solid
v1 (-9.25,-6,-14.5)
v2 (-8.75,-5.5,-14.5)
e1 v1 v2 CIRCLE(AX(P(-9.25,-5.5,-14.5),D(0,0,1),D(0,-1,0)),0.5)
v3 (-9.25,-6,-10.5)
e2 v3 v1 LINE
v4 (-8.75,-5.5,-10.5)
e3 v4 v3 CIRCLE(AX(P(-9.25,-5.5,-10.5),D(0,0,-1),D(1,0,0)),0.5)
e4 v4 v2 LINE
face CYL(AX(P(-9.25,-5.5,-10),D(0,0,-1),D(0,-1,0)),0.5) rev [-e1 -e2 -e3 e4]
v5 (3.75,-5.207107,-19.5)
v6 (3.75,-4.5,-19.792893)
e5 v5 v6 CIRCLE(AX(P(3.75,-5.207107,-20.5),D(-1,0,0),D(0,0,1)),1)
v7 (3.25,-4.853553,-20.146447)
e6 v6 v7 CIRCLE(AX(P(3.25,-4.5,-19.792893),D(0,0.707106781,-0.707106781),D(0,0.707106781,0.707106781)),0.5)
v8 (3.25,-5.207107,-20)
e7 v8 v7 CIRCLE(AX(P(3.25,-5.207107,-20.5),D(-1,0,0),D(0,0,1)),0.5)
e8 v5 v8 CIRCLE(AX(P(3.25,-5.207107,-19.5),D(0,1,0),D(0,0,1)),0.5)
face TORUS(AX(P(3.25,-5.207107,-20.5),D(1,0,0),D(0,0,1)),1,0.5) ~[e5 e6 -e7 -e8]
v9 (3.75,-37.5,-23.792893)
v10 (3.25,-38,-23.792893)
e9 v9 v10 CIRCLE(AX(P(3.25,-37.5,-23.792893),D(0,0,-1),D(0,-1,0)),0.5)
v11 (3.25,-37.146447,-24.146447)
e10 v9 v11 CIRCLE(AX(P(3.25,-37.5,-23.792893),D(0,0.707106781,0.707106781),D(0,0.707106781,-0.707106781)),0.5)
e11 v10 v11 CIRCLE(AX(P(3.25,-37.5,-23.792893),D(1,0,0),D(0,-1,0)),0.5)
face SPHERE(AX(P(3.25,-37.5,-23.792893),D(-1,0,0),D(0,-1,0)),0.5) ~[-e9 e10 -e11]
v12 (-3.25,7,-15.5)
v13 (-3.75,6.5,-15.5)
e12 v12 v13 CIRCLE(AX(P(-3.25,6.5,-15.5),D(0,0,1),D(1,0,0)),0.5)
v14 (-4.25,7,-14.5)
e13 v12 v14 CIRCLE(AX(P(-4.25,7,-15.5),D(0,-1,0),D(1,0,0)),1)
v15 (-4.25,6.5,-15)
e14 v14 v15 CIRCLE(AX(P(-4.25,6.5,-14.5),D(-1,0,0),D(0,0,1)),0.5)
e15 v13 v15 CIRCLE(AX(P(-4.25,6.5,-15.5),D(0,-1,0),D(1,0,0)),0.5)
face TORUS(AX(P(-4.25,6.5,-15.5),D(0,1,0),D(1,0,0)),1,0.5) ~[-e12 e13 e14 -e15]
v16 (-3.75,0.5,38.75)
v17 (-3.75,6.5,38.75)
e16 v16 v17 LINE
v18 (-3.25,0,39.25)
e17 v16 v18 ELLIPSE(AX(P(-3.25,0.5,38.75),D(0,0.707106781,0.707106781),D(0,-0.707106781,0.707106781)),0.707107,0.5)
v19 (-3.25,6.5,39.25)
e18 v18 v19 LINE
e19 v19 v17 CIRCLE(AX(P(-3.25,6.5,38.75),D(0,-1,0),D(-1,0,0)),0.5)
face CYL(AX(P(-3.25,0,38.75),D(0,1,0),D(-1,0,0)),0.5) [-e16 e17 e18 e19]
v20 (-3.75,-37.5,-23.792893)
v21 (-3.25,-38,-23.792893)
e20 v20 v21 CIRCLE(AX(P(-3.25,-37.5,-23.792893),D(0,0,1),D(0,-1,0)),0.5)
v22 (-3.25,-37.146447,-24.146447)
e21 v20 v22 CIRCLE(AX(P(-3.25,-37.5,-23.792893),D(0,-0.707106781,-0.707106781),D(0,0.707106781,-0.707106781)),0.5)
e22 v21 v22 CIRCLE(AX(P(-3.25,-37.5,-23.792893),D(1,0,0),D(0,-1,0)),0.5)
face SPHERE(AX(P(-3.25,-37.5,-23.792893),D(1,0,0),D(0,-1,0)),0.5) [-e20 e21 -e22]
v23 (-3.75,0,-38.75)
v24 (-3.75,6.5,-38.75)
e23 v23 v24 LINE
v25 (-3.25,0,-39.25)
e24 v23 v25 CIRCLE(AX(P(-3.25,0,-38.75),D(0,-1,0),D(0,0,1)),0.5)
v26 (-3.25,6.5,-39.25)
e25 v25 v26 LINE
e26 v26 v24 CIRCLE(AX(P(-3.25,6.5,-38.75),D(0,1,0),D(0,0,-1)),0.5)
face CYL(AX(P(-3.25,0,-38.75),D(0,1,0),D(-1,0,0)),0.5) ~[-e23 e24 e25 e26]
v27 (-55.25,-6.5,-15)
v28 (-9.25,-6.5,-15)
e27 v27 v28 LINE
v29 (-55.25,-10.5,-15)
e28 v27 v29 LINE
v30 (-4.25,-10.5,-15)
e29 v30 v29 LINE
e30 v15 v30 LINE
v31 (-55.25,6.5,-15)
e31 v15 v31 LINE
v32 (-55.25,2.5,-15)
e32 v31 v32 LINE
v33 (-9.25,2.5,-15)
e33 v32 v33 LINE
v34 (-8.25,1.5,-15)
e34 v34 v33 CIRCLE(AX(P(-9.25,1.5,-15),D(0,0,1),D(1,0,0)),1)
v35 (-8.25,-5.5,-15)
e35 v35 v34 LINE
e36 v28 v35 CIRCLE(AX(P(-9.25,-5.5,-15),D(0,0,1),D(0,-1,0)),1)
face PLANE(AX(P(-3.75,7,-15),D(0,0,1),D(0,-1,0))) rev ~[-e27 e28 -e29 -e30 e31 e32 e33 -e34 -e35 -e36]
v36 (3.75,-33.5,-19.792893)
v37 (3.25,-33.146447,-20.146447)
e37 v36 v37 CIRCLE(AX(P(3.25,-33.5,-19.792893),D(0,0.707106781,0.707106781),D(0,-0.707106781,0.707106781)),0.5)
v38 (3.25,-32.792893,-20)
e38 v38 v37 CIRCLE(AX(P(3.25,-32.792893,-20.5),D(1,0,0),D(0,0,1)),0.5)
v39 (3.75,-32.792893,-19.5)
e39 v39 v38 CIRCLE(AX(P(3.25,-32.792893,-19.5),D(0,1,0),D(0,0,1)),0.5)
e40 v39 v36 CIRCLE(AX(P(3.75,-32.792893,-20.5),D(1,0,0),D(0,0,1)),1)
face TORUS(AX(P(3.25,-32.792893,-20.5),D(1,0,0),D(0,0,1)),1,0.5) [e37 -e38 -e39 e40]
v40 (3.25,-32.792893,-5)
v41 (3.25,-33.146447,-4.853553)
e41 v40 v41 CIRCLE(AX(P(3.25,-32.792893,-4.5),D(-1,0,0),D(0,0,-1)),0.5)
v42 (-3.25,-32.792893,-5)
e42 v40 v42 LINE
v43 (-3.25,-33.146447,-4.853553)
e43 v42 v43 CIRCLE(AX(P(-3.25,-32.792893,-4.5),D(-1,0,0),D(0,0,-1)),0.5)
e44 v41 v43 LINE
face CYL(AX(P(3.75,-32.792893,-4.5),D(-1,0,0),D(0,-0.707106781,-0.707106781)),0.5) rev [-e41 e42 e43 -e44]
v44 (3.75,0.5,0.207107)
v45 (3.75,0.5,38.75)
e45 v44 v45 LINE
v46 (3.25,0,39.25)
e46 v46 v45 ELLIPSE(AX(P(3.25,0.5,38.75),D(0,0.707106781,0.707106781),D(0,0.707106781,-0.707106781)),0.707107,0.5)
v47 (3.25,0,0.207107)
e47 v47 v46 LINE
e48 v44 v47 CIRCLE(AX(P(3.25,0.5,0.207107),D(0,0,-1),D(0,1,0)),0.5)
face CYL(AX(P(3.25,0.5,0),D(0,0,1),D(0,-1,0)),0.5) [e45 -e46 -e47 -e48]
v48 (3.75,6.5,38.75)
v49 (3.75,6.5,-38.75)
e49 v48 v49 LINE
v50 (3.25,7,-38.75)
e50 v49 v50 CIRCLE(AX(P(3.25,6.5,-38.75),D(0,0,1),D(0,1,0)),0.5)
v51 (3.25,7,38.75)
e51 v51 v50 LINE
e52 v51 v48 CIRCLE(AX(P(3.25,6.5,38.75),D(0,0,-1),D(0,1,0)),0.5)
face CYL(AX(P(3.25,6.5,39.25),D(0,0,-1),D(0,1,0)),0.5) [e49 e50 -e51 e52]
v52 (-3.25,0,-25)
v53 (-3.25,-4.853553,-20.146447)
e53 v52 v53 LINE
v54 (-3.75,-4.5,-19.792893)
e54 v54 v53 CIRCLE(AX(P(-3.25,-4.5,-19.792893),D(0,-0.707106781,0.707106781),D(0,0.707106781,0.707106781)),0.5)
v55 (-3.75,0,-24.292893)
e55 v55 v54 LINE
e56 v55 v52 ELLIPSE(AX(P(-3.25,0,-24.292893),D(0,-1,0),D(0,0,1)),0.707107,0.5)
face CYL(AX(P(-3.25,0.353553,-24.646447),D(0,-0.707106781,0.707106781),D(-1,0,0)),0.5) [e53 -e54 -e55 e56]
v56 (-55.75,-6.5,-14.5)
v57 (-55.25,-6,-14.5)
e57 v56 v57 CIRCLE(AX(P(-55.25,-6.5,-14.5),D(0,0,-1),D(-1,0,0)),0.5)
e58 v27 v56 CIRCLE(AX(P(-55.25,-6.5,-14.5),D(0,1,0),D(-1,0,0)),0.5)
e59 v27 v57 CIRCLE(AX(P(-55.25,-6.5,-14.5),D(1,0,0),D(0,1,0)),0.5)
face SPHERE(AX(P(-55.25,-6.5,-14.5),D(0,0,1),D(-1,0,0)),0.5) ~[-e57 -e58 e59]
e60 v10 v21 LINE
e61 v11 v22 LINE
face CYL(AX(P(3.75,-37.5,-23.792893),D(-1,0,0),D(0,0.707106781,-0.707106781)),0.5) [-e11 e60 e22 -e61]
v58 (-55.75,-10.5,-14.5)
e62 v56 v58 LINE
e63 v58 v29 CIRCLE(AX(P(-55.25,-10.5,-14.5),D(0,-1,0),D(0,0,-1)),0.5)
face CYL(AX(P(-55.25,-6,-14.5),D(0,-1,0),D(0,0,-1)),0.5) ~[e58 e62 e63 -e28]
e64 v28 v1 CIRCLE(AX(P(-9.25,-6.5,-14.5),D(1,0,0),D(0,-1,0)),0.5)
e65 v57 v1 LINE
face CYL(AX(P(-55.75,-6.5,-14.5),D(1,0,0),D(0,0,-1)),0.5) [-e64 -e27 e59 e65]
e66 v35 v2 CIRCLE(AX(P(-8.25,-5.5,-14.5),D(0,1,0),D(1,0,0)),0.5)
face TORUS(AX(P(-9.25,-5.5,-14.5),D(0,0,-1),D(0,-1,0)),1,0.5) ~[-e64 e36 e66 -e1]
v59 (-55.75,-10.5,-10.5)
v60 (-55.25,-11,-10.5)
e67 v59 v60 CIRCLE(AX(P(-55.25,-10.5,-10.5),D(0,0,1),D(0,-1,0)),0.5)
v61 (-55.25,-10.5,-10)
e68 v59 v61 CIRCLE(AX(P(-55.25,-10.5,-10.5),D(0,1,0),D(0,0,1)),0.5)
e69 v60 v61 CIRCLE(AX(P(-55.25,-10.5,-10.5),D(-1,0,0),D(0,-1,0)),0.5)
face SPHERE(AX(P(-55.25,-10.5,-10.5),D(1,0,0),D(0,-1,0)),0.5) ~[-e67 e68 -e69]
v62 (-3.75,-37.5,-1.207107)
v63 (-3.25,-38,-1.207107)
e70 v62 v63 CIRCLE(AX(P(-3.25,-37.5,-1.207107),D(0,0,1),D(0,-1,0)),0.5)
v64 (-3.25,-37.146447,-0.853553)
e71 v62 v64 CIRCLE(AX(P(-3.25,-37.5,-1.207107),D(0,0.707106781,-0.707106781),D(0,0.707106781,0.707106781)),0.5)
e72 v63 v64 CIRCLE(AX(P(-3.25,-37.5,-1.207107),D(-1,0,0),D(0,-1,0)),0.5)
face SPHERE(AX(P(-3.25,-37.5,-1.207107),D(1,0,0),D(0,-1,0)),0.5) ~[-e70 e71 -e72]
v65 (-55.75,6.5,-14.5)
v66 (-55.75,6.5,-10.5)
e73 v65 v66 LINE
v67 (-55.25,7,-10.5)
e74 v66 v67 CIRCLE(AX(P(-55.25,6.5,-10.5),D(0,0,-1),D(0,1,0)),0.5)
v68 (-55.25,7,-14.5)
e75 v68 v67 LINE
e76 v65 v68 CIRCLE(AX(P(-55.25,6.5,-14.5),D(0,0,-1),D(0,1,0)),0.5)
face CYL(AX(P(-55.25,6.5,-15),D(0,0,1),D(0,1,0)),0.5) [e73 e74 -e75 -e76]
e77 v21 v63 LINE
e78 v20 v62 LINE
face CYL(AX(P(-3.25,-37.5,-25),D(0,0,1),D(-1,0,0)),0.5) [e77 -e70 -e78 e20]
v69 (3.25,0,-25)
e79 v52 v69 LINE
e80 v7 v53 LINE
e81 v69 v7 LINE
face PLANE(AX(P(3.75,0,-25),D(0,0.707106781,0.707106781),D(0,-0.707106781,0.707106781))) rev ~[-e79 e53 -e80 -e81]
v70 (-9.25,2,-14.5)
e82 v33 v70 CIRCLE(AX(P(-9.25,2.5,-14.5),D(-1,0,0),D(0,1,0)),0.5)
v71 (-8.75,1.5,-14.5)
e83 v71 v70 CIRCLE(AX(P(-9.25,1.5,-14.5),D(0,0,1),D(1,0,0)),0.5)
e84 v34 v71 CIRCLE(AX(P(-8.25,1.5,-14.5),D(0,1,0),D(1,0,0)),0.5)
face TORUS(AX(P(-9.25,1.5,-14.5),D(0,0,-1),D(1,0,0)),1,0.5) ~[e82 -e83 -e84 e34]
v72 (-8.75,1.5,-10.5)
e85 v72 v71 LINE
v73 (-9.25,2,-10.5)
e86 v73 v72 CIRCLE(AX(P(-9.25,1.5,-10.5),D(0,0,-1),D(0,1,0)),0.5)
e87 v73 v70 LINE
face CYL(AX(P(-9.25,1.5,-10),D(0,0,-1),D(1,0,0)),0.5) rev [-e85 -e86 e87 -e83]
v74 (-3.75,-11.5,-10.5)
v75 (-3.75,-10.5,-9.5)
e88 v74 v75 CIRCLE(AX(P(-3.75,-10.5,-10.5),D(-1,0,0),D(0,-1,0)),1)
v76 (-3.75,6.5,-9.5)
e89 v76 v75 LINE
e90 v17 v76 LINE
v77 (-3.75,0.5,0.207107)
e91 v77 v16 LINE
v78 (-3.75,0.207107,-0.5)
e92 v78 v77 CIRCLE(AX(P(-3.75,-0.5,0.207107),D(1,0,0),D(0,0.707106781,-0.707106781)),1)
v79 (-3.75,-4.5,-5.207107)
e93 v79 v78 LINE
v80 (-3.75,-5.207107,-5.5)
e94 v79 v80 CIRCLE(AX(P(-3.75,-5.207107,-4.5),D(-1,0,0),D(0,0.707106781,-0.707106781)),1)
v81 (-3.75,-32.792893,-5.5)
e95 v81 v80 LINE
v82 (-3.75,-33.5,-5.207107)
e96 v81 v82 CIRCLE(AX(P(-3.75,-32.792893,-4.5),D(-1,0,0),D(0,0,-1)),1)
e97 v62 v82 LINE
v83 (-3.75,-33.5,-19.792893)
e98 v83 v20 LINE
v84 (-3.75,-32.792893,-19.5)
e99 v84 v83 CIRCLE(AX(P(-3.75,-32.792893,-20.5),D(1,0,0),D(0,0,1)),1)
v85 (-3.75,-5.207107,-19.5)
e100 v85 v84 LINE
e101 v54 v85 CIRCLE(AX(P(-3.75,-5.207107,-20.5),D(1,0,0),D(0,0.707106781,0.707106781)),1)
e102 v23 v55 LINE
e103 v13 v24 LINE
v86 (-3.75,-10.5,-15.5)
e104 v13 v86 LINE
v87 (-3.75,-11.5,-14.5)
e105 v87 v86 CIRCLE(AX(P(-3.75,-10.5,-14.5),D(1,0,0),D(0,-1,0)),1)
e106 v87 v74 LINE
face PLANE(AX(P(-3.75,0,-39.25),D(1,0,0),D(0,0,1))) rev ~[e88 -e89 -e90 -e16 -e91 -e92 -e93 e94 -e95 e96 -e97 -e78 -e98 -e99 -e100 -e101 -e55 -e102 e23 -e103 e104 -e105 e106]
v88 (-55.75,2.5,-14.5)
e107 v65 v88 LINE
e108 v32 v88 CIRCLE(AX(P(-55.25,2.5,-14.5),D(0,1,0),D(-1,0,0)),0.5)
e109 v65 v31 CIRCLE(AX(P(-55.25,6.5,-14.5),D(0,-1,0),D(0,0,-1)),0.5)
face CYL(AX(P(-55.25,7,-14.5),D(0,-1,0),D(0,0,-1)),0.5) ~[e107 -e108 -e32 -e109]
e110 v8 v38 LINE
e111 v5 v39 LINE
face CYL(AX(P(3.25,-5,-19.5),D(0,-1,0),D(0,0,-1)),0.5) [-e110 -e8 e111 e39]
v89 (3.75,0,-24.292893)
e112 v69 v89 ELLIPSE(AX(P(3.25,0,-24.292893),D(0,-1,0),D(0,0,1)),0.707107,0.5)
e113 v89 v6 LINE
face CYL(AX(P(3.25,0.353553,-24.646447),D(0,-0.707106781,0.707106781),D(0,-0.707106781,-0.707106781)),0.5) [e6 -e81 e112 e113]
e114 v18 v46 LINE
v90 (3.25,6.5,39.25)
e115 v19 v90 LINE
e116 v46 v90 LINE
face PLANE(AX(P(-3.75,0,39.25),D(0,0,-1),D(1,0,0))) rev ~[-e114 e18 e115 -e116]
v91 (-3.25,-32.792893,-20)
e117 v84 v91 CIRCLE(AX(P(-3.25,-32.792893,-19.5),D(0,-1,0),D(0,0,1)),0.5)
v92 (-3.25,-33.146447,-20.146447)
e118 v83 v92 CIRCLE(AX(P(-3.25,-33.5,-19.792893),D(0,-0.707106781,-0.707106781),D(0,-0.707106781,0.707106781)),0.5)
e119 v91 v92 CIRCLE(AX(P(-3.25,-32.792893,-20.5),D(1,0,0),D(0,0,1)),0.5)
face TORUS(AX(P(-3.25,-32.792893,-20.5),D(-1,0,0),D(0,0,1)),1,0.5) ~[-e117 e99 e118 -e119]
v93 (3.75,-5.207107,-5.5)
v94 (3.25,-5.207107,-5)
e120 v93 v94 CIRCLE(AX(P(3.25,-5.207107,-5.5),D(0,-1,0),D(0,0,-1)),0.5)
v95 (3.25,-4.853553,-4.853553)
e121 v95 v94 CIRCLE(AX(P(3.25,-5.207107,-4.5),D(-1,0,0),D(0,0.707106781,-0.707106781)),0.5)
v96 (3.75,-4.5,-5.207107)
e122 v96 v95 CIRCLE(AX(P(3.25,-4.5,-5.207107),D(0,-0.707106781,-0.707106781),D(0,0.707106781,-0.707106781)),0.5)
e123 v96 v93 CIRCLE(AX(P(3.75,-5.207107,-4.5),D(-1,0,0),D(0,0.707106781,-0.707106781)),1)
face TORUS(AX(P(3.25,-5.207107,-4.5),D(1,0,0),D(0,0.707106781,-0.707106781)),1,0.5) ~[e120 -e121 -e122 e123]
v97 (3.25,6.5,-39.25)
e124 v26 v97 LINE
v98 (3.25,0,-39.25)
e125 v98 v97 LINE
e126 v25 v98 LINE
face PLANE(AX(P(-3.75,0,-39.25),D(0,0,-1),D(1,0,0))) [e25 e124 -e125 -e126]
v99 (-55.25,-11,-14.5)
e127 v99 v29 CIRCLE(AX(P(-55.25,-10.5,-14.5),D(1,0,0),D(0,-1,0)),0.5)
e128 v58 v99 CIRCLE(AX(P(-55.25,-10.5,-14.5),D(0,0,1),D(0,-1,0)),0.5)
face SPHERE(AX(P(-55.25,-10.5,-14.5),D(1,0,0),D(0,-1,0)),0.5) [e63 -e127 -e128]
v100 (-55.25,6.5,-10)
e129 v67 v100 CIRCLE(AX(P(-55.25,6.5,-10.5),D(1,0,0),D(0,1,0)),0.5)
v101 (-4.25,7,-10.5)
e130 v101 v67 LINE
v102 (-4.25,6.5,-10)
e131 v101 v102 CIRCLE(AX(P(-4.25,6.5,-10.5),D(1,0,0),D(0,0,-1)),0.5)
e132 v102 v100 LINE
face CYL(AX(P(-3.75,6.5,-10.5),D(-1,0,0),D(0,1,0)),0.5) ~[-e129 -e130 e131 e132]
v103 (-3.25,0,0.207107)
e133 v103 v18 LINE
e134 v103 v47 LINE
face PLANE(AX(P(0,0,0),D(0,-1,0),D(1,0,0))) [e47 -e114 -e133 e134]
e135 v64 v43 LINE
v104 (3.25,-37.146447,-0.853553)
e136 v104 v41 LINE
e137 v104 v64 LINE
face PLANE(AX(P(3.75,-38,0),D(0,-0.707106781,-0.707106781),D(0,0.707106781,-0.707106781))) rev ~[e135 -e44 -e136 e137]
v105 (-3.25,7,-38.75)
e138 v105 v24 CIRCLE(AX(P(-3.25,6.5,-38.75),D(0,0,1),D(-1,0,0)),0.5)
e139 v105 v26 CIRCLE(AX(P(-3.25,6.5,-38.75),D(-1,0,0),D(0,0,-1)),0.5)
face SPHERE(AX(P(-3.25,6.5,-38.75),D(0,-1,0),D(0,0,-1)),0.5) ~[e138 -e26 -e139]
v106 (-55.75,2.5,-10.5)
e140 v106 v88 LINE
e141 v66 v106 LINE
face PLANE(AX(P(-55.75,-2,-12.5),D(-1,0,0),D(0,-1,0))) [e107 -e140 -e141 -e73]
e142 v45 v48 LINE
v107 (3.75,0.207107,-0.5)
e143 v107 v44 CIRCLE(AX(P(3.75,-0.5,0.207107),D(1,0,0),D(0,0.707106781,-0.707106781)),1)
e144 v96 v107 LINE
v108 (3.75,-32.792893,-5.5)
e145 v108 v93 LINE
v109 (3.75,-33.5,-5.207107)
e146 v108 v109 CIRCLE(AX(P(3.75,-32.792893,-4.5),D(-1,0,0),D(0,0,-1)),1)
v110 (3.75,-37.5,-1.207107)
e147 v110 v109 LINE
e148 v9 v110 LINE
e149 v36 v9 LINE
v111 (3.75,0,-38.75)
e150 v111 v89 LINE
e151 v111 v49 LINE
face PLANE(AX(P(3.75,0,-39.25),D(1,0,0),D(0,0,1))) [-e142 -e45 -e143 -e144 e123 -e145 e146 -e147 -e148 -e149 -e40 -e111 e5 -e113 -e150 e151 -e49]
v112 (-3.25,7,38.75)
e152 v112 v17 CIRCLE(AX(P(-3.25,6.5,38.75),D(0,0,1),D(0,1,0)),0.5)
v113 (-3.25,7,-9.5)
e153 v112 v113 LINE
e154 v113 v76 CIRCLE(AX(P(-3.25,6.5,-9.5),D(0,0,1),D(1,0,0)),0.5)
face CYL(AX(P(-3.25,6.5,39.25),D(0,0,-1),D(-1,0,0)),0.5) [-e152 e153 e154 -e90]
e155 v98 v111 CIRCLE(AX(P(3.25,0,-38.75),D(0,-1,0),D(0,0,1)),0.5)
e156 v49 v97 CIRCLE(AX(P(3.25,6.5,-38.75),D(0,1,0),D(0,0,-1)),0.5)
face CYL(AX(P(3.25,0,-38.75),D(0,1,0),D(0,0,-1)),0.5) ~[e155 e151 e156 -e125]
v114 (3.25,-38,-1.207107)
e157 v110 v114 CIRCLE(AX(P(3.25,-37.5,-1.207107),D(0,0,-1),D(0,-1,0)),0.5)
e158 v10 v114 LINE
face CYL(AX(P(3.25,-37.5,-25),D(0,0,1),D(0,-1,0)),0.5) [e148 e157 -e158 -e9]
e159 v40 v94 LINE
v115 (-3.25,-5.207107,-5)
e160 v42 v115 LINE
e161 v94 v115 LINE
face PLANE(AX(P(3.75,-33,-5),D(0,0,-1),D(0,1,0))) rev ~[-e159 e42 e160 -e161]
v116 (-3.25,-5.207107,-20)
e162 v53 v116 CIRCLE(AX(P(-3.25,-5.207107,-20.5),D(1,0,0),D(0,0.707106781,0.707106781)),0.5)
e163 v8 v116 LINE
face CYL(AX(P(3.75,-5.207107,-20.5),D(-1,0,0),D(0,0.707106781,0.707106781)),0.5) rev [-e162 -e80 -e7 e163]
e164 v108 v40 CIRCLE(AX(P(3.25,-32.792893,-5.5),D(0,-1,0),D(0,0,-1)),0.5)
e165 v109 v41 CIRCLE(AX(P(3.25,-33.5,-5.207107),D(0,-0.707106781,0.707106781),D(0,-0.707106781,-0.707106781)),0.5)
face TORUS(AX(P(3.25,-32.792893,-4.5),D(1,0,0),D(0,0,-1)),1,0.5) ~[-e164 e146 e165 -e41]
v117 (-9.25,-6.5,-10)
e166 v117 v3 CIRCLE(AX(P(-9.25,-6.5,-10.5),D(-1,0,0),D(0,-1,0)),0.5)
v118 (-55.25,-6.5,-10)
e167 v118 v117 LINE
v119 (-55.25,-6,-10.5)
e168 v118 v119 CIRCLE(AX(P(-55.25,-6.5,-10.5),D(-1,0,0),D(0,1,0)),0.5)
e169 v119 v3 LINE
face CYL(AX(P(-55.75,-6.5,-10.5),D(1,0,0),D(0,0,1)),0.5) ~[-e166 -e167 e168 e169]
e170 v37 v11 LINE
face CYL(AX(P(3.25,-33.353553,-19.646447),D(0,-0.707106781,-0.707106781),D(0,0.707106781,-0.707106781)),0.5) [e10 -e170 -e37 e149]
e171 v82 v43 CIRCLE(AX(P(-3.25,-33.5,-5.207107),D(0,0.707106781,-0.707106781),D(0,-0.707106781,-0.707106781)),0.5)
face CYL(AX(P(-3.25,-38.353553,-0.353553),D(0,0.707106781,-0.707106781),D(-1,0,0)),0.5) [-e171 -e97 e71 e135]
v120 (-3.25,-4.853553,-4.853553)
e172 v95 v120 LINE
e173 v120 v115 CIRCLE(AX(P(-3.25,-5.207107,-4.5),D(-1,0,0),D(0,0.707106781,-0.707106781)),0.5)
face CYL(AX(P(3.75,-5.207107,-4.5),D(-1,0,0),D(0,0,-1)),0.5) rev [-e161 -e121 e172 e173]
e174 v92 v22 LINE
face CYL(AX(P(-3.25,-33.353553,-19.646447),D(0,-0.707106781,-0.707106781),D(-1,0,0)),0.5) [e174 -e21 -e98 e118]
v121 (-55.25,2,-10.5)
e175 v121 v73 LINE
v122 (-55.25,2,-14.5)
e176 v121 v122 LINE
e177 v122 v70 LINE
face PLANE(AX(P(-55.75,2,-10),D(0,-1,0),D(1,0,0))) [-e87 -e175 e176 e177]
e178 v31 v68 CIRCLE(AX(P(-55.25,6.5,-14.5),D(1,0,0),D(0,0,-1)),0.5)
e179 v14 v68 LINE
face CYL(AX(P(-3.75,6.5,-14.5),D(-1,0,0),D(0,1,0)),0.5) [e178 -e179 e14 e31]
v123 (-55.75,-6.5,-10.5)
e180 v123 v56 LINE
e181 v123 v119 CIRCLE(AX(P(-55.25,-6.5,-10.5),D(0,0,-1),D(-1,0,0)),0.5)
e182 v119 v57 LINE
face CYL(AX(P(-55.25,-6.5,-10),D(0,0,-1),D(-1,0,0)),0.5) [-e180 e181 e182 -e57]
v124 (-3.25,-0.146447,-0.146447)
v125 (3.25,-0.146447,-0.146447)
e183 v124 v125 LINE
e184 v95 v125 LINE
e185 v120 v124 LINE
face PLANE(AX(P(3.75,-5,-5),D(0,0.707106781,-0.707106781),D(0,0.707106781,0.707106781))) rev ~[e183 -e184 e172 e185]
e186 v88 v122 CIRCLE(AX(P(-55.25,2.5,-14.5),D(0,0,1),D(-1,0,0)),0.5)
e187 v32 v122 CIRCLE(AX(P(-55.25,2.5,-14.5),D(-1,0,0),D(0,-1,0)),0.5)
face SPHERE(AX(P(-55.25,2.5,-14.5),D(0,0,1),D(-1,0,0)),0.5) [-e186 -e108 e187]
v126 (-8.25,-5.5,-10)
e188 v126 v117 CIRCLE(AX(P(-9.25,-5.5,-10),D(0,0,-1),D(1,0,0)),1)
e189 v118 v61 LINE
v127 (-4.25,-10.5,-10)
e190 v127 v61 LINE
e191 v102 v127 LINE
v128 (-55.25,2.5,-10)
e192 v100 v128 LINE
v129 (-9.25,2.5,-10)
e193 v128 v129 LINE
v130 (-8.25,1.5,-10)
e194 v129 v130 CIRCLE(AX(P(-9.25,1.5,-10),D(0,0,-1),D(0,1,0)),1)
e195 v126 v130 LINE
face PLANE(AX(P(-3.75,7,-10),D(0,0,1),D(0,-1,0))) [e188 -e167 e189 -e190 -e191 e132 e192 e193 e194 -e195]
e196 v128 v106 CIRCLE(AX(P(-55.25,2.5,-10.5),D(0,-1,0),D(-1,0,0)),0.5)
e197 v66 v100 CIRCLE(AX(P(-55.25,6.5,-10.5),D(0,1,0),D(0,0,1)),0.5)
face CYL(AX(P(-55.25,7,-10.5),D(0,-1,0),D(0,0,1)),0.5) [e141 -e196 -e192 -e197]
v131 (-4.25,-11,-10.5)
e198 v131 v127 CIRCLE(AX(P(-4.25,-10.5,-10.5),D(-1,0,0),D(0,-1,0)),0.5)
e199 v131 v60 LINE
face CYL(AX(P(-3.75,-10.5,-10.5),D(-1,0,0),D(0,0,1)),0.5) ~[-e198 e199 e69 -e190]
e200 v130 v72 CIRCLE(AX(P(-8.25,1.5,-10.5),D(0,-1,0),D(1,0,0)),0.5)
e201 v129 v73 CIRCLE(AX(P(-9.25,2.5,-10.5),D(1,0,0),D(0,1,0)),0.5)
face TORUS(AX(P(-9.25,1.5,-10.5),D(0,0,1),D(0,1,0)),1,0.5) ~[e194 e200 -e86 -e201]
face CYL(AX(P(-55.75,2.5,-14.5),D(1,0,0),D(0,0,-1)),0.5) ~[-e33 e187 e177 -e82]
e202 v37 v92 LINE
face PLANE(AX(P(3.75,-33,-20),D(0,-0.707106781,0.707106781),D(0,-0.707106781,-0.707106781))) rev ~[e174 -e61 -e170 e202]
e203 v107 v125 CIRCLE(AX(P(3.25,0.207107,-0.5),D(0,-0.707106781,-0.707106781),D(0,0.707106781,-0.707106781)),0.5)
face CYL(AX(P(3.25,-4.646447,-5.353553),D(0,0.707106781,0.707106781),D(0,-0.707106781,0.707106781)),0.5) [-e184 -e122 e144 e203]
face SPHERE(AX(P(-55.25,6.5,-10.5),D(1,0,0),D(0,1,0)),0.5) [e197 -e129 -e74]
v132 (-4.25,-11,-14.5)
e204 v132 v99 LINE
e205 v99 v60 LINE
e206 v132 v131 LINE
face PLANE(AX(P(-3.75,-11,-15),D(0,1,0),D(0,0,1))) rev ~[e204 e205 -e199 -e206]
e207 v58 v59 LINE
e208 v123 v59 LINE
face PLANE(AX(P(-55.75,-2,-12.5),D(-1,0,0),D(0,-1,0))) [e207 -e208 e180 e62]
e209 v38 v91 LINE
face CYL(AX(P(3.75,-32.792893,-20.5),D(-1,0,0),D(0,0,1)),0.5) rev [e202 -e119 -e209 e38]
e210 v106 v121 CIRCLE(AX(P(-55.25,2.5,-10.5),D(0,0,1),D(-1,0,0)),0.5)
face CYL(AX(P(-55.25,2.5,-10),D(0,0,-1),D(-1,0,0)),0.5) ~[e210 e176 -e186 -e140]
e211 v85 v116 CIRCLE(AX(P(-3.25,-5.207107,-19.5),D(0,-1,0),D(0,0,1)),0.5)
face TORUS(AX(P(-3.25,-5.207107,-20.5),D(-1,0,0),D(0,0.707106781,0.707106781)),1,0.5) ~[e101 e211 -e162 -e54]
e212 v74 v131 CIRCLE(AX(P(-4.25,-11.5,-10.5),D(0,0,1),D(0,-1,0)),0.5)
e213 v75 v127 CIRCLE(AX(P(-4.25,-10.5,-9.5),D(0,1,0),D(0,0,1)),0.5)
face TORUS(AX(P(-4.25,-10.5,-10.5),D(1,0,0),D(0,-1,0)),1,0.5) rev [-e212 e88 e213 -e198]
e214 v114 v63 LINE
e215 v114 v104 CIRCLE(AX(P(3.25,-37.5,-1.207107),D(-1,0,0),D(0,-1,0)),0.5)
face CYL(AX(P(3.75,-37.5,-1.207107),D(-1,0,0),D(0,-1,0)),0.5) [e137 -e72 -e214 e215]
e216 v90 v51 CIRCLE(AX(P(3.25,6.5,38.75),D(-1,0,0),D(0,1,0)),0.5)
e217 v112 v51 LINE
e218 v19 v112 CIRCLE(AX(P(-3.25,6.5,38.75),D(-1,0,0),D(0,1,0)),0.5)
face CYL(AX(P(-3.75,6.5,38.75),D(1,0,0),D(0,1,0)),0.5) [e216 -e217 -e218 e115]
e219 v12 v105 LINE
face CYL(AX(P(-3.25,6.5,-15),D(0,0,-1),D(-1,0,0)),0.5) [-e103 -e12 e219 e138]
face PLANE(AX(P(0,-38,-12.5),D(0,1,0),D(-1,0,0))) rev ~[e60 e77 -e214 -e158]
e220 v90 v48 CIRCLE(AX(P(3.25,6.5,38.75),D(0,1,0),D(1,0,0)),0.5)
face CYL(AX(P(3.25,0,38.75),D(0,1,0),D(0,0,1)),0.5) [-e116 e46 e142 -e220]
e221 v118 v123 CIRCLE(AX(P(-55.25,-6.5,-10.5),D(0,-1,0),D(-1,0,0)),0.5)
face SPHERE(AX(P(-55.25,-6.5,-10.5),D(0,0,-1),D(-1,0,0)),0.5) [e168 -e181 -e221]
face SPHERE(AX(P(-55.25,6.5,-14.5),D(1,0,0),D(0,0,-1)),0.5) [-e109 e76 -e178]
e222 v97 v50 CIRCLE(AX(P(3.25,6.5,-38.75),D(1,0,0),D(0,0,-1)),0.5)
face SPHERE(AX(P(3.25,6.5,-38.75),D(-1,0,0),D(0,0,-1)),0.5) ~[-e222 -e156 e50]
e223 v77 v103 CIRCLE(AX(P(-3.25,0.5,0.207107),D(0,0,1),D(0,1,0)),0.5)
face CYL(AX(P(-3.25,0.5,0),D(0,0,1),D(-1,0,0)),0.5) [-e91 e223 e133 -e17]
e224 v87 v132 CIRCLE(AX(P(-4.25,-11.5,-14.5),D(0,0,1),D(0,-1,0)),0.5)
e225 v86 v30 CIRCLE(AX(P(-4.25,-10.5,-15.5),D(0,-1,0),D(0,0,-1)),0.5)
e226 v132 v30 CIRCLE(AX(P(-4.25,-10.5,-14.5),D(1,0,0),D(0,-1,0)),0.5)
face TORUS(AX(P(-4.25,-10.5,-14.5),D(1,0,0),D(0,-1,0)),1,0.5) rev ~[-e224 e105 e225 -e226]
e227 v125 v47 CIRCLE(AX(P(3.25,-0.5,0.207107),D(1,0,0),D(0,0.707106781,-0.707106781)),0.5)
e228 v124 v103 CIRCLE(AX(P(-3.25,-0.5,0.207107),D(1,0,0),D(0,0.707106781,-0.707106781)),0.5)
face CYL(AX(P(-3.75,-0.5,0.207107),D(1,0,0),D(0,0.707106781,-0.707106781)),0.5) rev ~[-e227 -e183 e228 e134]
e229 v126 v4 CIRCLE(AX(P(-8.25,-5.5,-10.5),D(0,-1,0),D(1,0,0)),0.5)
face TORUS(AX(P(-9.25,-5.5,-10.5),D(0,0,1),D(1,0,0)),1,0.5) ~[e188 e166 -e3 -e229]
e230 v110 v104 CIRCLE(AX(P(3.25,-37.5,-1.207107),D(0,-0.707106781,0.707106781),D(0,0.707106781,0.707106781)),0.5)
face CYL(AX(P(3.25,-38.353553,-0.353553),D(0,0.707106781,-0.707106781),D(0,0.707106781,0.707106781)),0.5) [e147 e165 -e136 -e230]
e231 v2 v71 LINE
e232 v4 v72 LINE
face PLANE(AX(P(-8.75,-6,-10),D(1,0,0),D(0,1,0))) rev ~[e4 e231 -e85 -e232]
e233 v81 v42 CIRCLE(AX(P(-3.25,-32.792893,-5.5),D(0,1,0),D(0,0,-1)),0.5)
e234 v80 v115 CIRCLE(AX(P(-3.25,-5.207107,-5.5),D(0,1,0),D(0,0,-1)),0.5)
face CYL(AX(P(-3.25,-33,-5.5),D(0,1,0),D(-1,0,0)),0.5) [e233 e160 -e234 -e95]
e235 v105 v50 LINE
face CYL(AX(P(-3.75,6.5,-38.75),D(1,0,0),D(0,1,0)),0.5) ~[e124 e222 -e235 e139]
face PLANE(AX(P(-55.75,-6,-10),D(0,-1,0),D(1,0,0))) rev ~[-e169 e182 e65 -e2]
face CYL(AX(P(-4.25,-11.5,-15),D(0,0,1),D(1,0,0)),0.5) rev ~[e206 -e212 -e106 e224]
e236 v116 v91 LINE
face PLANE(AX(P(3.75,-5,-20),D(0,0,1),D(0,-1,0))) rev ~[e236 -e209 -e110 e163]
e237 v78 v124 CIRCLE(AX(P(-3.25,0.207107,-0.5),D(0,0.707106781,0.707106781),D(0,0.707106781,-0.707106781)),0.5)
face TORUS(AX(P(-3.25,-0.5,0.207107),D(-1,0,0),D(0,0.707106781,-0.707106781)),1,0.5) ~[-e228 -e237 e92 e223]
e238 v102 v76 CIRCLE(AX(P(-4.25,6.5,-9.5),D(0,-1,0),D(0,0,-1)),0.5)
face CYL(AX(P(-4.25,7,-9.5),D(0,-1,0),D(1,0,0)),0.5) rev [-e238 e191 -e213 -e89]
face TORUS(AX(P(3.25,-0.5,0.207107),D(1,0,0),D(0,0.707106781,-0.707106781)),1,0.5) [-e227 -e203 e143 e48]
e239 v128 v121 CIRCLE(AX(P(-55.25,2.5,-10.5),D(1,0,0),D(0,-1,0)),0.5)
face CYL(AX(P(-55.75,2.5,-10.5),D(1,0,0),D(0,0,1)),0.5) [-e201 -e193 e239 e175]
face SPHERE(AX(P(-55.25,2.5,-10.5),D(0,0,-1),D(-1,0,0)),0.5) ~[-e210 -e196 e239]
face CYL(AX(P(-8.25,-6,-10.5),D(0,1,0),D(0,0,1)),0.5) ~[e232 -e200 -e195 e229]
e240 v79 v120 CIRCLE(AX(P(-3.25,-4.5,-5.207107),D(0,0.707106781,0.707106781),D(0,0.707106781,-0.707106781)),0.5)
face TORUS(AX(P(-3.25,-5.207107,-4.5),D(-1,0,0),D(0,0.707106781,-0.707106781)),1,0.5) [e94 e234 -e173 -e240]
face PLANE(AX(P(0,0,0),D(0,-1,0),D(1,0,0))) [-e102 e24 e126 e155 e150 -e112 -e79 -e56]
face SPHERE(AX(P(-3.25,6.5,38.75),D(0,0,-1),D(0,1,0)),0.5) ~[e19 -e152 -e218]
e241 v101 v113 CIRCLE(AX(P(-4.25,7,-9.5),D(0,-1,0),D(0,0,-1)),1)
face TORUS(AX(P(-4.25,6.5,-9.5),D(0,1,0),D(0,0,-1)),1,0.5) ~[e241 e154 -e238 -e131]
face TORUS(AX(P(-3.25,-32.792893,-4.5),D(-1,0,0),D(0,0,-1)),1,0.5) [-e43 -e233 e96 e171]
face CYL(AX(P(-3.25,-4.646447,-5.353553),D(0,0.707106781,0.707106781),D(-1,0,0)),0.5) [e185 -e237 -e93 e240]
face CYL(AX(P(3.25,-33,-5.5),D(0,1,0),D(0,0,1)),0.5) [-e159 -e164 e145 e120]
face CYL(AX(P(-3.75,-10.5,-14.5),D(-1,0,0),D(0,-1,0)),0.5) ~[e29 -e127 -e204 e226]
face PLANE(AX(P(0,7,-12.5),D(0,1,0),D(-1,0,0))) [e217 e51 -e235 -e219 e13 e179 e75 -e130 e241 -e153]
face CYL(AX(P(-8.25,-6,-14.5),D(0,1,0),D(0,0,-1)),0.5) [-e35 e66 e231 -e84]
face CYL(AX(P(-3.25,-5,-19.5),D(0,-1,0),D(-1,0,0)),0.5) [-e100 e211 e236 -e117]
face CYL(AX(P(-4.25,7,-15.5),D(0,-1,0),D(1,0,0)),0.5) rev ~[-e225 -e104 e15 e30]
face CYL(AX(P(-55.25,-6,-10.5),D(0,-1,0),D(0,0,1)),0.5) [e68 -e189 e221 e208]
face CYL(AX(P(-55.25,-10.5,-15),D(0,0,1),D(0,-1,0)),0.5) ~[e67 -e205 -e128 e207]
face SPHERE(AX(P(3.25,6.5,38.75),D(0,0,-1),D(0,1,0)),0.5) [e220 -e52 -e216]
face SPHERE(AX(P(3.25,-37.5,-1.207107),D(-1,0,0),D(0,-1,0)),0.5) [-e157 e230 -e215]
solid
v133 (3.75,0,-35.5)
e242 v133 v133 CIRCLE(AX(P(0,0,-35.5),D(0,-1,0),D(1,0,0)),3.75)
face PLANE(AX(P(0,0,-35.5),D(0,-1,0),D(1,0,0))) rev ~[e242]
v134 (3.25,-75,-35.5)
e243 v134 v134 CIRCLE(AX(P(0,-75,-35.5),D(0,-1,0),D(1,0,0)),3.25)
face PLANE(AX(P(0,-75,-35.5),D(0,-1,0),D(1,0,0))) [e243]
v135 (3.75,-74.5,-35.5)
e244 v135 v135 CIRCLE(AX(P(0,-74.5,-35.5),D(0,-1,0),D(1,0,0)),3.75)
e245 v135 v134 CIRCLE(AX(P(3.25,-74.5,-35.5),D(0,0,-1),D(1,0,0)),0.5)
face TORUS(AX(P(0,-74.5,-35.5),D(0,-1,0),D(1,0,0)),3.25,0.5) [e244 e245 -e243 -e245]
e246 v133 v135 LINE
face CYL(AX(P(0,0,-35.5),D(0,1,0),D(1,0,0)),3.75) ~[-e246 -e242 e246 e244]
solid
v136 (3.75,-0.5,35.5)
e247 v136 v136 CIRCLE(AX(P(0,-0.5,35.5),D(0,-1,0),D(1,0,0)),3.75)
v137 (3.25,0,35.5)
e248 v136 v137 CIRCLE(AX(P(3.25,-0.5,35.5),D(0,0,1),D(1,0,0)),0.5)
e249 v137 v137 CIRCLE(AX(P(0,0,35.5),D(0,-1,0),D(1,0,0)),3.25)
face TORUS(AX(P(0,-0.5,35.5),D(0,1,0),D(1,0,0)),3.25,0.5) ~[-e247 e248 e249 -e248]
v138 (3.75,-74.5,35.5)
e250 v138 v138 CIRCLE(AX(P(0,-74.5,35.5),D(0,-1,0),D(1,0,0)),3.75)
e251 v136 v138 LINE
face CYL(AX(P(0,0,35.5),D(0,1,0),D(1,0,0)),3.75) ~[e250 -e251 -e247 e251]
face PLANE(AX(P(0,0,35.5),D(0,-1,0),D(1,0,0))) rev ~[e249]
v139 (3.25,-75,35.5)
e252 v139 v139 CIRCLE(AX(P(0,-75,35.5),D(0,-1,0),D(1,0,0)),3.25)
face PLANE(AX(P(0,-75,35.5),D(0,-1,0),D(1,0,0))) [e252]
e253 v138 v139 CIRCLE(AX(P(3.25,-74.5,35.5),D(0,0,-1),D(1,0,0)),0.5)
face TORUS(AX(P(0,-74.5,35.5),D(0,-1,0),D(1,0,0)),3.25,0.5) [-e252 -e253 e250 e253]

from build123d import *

# Parameters (mm, degrees)
F0_R      = 3.75
F1_DEPTH  = 75
F2_W      = 7.5
F2_H      = 78.5
F3_DEPTH  = 7
F4_W      = 7.5
F4_H      = 25
F5_DEPTH  = 45
F7_DEPTH  = 25
F8_W      = 18
F8_H      = 5
F9_DEPTH  = 52
F10_W     = 47
F10_H     = 8
F11_DEPTH = 25
F12_R     = 0.5
F12_2_R   = 0.5
F12_3_R   = 0.5


with BuildPart() as f1:
    # F0 (on Front) → F1 (new body)
    with BuildSketch(Plane.XZ):
        with Locations((0, 35.5)):
            Circle(F0_R)
    extrude(amount=F1_DEPTH)

    # F12
    f12_edges = [f1.edges().sort_by_distance(p)[0] for p in [
        (-3.75, -75, 35.5),
        (3.75, -37.5, 35.5),
        (-3.75, 0, 35.5),
    ]]
    fillet(f12_edges, radius=F12_R)


with BuildPart() as f1b:
    # F0 (on Front) → F1, piece 2 (new body)
    with BuildSketch(Plane.XZ):
        with Locations((0, -35.5)):
            Circle(F0_R)
    extrude(amount=F1_DEPTH)

    # F12#2
    f12_2_edges = [f1b.edges().sort_by_distance(p)[0] for p in [
        (-3.75, -75, -35.5),
    ]]
    fillet(f12_2_edges, radius=F12_2_R)


with BuildPart() as f3:
    # F2 (on Front) → F3 (new body)
    with BuildSketch(Plane.XZ):
        Rectangle(F2_W, F2_H)
    extrude(amount=-F3_DEPTH)

    # F4 (on face) → F5 (join)
    with BuildSketch(Plane(origin=(0, 7, 0), x_dir=(-1, 0, 0), z_dir=(0, 1, 0))):
        with Locations((0, -12.5)):
            Rectangle(F4_W, F4_H)
    extrude(amount=-F5_DEPTH)

    # F6 (on face) → F7 (cut)
    with BuildSketch(Plane.YZ.offset(3.75)):
        Polygon((0, 0), (-38, 0), (-33, -5), (-5, -5), align=None)
        Polygon((-33, -20), (-38, -25), (0, -25), (-5, -20), align=None)
    extrude(amount=-F7_DEPTH, mode=Mode.SUBTRACT)

    # F8 (on face) → F9 (join)
    with BuildSketch(Plane(origin=(-3.75, 0, 0), x_dir=(0, -1, 0), z_dir=(-1, 0, 0))):
        with Locations((2, -12.5)):
            Rectangle(F8_W, F8_H)
    extrude(amount=F9_DEPTH)

    # F10 (on face) → F11 (cut)
    with BuildSketch(Plane.XY.offset(-10)):
        with Locations((-32.25, -2)):
            Rectangle(F10_W, F10_H)
    extrude(amount=-F11_DEPTH, mode=Mode.SUBTRACT)

    # F12#3
    f12_3_edges = [f3.edges().sort_by_distance(p)[0] for p in [
        (-55.75, 2, -12.5),
        (-55.75, -6, -12.5),
        (-8.75, 2, -12.5),
        (-3.75, 3.5, -39.25),
        (0, 7, -39.25),
        (3.75, 3.5, -39.25),
        (-3.75, 7, -27.125),
        (3.75, 7, 0),
        (-29.75, 7, -15),
        (-29.75, 7, -10),
        (-3.75, 7, 14.625),
        (3.75, -19, -20),
        (3.75, -2.5, -22.5),
        (-3.75, -2.5, -22.5),
        (-3.75, -19, -20),
        (0, -5, -20),
        (0, 0, 0),
        (0, -5, -5),
        (3.75, -2.5, -2.5),
        (3.75, -19, -5),
        (-3.75, -2.5, -2.5),
        (-3.75, 0, 19.625),
        (-3.75, -35.5, -2.5),
        (-29.75, -11, -15),
        (-29.75, -11, -10),
        (-3.75, -11, -12.5),
        (-55.75, -11, -12.5),
        (0, 7, 39.25),
        (3.75, 3.5, 39.25),
        (-3.75, 3.5, 39.25),
        (0, -38, -25),
        (0, -38, 0),
        (3.75, -38, -12.5),
        (-3.75, -38, -12.5),
        (3.75, -35.5, -22.5),
        (-3.75, -35.5, -22.5),
        (0, -33, -20),
        (3.75, -35.5, -2.5),
        (0, -33, -5),
        (-55.75, 4.5, -15),
        (-55.75, 7, -12.5),
        (-55.75, 4.5, -10),
        (-55.75, -8.5, -15),
        (-55.75, -8.5, -10),
        (-32.25, -6, -10),
        (-8.75, -6, -12.5),
        (-32.25, -6, -15),
        (3.75, 0, 19.625),
        (-3.75, -19, -5),
        (-3.75, -2, -15),
        (-3.75, -2, -10),
        (-32.25, 2, -10),
        (-8.75, -2, -10),
        (-8.75, -2, -15),
        (-32.25, 2, -15),
    ]]
    fillet(f12_3_edges, radius=F12_3_R)


solid = Compound([f1.part, f1b.part, f3.part])
